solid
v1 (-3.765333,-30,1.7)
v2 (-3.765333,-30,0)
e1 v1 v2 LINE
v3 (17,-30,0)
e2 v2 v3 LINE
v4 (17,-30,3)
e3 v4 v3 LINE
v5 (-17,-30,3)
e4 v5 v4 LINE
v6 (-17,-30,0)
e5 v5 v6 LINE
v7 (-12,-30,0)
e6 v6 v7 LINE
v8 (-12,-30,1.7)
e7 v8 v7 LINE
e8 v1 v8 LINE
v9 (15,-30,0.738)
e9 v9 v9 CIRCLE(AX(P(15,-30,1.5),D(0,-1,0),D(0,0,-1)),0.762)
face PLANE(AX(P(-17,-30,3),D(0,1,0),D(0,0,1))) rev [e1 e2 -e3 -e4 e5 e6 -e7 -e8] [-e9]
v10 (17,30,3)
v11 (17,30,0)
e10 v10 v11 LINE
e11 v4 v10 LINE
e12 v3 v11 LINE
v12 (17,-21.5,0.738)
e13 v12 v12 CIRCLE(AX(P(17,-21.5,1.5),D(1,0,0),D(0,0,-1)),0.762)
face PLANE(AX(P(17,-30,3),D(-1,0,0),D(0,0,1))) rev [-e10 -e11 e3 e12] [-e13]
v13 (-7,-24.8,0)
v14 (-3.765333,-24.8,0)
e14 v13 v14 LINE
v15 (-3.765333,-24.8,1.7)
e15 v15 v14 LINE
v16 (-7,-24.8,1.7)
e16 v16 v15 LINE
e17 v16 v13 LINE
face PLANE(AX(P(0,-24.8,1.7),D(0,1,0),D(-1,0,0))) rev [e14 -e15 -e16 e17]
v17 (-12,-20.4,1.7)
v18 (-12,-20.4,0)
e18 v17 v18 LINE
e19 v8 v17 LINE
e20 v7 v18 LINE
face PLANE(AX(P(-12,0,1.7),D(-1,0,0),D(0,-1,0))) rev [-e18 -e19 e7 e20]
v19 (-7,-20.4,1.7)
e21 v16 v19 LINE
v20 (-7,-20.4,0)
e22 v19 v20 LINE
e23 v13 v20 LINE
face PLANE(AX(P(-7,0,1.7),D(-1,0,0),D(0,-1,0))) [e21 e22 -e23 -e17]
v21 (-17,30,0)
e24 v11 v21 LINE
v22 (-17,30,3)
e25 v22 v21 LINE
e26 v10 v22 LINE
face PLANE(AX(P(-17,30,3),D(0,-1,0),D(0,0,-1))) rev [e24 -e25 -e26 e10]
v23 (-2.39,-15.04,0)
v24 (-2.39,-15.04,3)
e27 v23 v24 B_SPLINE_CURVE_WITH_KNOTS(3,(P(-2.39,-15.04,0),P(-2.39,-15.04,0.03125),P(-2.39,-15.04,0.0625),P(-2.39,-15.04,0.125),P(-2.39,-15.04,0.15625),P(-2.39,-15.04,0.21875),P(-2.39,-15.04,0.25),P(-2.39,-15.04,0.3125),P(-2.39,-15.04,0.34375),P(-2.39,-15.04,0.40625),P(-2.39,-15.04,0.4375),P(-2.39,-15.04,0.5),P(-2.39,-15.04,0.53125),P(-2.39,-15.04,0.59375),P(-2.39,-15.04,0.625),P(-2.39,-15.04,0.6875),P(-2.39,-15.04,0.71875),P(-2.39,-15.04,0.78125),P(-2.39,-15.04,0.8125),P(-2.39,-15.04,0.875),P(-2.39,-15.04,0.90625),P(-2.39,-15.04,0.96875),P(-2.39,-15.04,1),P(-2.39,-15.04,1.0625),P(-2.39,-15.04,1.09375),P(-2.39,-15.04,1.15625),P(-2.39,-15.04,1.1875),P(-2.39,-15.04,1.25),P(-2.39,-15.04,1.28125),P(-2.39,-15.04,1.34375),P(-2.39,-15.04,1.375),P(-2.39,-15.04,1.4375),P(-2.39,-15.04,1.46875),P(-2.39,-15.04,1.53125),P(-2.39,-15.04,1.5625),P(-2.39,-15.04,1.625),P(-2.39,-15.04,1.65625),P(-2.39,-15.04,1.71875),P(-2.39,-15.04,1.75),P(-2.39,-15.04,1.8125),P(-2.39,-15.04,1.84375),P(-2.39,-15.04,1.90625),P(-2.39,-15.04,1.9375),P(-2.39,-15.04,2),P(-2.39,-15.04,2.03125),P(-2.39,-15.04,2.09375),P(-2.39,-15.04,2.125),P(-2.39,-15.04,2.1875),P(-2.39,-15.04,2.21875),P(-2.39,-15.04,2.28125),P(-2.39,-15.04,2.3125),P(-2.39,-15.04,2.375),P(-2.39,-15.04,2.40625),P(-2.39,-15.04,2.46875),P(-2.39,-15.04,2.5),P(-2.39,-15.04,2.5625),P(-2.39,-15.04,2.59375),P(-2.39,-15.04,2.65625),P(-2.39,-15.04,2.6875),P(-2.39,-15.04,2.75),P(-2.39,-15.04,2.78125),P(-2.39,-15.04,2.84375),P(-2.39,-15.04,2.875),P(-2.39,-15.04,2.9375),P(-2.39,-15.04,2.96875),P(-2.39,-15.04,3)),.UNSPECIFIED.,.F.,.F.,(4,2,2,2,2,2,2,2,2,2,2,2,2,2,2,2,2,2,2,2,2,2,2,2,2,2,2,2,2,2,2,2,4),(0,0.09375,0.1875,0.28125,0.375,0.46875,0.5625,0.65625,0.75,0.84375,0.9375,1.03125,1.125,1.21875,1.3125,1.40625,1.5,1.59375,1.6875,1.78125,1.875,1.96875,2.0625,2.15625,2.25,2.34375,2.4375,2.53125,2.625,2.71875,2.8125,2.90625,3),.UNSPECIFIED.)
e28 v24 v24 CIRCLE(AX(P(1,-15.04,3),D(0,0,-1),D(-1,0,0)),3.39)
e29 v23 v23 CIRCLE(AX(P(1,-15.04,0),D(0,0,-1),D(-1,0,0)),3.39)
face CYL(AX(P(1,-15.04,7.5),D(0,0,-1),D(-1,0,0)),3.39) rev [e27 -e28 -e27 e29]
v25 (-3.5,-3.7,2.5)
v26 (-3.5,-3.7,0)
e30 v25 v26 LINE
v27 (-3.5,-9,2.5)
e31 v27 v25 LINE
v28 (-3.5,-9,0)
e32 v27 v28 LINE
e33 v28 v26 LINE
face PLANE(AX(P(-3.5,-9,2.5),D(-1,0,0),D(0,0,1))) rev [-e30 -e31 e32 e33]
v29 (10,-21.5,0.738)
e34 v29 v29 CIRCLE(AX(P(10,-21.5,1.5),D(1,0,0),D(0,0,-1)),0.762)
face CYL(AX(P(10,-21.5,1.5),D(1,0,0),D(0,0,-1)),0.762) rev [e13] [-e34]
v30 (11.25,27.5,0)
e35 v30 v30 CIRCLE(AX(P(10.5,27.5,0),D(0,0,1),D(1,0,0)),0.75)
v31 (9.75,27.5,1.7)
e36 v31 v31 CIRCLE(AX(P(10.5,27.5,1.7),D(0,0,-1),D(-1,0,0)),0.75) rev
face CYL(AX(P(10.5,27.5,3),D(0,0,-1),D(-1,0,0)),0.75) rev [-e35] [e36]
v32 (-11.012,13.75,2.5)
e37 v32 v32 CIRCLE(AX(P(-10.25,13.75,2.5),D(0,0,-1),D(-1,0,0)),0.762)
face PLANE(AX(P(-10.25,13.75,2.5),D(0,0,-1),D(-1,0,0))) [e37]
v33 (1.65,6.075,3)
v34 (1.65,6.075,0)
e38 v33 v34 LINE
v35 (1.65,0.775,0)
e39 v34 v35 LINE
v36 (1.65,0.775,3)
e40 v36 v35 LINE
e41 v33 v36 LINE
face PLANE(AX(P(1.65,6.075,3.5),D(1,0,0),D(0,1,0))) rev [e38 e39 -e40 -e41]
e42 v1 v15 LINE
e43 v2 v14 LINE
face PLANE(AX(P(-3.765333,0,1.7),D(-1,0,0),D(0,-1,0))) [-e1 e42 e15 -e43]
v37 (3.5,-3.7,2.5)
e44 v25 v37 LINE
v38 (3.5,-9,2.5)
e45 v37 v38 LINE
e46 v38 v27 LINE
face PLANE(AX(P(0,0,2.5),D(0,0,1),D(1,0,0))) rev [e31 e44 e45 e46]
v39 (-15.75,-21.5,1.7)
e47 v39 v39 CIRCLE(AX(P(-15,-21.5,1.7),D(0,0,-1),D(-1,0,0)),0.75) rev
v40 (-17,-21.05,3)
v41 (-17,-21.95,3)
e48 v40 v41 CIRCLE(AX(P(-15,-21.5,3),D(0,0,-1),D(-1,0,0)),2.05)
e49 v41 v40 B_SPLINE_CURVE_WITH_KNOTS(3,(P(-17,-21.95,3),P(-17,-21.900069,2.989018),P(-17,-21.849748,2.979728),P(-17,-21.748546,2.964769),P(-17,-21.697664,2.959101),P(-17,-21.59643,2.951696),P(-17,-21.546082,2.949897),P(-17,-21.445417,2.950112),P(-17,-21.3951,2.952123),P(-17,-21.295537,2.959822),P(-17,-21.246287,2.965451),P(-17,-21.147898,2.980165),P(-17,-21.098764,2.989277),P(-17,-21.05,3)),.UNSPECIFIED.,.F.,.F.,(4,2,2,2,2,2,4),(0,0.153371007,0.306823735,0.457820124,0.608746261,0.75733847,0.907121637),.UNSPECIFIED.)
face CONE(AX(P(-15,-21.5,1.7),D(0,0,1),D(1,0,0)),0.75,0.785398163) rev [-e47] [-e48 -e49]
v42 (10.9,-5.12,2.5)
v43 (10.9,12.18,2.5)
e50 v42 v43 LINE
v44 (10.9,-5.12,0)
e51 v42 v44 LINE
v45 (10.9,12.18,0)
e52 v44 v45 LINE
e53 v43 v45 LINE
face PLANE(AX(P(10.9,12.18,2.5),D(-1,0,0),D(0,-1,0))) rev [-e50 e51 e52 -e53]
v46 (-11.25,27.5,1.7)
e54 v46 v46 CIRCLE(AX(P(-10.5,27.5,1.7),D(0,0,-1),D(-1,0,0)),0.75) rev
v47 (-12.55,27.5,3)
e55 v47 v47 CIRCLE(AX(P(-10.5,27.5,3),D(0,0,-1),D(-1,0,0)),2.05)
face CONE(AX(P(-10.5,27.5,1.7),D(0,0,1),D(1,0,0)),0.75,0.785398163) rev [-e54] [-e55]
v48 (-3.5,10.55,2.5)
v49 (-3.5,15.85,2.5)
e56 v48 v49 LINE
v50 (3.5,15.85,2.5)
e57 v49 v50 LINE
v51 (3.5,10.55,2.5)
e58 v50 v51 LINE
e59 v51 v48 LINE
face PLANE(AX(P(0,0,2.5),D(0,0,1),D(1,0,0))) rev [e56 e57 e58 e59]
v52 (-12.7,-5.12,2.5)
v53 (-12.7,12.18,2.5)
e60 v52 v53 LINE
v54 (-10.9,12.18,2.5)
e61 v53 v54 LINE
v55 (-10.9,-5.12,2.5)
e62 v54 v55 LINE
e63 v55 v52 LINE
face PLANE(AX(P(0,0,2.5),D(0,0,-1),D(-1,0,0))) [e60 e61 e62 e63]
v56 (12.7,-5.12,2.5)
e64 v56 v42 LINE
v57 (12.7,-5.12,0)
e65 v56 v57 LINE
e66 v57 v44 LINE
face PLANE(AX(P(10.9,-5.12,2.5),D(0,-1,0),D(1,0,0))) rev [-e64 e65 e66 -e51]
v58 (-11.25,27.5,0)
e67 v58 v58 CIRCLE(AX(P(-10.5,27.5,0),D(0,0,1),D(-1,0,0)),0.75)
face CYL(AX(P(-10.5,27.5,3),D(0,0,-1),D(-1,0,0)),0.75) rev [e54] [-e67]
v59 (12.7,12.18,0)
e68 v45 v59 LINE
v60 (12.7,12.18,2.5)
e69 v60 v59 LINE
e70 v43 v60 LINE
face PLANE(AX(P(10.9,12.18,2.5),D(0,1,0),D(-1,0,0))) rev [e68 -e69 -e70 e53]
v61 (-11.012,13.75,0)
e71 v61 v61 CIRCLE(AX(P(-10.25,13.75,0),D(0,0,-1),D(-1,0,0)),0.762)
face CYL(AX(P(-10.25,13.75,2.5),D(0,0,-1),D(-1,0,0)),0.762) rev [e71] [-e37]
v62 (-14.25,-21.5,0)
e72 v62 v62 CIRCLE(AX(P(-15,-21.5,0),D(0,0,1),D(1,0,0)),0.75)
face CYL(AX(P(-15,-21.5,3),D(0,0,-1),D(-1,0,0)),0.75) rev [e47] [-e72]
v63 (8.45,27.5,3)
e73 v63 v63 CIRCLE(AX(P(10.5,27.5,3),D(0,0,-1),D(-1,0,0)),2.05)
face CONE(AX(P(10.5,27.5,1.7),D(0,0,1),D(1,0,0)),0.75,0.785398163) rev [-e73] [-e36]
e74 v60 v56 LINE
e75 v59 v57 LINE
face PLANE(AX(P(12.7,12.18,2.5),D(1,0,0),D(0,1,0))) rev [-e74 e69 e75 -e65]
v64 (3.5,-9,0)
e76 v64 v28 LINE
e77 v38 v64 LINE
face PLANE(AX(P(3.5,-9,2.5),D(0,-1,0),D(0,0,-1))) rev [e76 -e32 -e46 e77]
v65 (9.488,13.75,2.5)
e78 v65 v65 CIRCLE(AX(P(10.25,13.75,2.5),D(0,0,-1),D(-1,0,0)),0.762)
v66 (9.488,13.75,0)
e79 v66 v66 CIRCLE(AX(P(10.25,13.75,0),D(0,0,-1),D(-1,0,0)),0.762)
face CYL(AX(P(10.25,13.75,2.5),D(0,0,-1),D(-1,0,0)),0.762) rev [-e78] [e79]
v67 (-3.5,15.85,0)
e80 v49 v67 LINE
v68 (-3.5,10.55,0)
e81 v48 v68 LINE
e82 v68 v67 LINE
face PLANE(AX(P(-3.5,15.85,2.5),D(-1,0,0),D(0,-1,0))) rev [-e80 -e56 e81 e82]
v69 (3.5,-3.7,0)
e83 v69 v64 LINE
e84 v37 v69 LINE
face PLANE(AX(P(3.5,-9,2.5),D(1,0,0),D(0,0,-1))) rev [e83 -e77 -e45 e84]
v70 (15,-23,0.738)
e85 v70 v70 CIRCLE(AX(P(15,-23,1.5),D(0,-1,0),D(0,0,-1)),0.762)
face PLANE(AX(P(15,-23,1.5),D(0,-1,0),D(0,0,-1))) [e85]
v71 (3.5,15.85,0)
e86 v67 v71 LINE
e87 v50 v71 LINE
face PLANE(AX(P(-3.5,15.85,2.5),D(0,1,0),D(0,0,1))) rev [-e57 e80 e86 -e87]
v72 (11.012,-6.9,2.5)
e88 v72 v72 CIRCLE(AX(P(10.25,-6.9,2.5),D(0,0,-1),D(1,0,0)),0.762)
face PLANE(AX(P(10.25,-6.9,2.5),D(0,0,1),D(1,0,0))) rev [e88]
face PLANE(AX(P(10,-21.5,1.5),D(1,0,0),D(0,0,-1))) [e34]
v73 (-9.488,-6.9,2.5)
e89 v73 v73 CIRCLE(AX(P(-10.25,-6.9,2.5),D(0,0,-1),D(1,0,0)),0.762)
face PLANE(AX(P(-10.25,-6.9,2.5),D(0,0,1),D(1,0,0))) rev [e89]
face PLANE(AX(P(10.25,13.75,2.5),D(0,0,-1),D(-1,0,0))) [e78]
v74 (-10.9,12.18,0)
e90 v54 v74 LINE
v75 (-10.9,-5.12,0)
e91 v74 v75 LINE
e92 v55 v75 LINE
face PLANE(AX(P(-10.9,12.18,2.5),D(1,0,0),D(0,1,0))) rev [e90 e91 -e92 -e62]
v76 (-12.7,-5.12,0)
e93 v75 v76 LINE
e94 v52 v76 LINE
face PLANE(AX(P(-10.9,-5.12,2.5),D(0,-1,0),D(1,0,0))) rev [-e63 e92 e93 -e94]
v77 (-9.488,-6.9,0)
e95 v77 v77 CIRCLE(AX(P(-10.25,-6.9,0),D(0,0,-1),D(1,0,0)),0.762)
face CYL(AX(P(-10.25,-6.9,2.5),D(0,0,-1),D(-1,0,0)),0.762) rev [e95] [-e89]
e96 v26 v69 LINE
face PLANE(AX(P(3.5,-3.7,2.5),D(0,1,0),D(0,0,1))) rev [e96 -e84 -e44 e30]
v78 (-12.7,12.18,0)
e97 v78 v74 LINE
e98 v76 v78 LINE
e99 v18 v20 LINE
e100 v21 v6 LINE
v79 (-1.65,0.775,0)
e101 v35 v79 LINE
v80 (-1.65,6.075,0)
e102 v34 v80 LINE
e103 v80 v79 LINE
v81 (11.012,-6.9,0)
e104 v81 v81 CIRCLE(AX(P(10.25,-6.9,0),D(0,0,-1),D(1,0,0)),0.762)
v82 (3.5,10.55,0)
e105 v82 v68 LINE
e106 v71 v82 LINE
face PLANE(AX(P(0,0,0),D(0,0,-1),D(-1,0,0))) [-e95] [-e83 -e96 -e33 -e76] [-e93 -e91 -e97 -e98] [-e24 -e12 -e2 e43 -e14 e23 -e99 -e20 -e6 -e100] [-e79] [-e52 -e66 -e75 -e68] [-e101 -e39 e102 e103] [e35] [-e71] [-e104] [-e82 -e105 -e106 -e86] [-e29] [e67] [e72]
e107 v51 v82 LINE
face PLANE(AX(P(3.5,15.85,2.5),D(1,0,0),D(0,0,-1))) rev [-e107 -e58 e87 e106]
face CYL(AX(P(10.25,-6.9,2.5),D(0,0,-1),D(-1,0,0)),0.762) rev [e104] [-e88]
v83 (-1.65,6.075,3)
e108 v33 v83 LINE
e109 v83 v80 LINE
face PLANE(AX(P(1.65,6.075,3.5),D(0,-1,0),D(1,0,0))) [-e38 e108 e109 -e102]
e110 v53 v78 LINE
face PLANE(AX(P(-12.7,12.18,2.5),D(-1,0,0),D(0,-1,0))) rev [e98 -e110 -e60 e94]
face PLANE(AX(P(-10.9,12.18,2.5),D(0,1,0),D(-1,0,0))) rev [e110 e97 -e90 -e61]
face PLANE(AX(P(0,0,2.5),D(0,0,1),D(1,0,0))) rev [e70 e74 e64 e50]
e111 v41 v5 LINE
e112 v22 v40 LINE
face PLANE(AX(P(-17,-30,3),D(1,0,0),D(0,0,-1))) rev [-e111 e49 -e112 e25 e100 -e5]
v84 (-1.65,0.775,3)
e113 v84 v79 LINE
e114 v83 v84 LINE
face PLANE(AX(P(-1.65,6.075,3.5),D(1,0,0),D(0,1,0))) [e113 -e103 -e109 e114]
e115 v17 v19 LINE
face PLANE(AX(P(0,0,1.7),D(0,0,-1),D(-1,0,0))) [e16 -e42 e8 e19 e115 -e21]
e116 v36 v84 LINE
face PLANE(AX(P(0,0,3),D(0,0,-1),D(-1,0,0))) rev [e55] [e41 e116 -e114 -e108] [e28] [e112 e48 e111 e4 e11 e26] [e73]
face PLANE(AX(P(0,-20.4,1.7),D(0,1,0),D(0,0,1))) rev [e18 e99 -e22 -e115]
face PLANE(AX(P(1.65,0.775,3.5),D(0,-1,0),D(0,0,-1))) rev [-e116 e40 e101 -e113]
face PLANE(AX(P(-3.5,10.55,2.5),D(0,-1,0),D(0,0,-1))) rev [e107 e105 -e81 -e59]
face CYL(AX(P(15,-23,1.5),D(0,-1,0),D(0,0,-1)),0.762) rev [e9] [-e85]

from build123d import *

# Parameters (mm, degrees)
SKETCH1_W           = 34
SKETCH1_H           = 60
SKETCH1_R           = 0.75
BOSS_EXTRUDE1_DEPTH = 3
CHAMFER1_SIZE       = 1.3
SKETCH2_R           = 0.762
CUT_EXTRUDE1_DEPTH  = 7
SKETCH3_W           = 5
SKETCH3_H           = 4.4
CUT_EXTRUDE2_DEPTH  = 1.7
SKETCH4_R           = 0.762
CUT_EXTRUDE3_DEPTH  = 7
SKETCH5_W           = 3.3
SKETCH5_H           = 5.3
CUT_EXTRUDE4_DEPTH  = 3.5
SKETCH7_R           = 0.762
SKETCH7_W           = 7
SKETCH7_H           = 5.3
CUT_EXTRUDE5_DEPTH  = 2.5
SKETCH8_W           = 1.8
SKETCH8_H           = 17.3
CUT_EXTRUDE6_DEPTH  = 2.5
SKETCH9_R           = 3.39
CUT_EXTRUDE7_DEPTH  = 7.5


with BuildPart() as part:
    # Sketch1 → Boss-Extrude1 (new body)
    with BuildSketch(Plane.XY):
        Rectangle(SKETCH1_W, SKETCH1_H)
        with Locations((-15, -21.5)):
            Circle(SKETCH1_R, mode=Mode.SUBTRACT)
        with Locations(Location((-10.5, 27.5, 0), (0, 0, 180))):
            Circle(SKETCH1_R, mode=Mode.SUBTRACT)
        with Locations((10.5, 27.5)):
            Circle(SKETCH1_R, mode=Mode.SUBTRACT)
    extrude(amount=BOSS_EXTRUDE1_DEPTH)

    # Chamfer1
    # the kernel refuses this chamfer: 1.3 mm, written as the material it takes off along each edge
    with BuildSketch(Plane(origin=(-15, -21.5, 3), x_dir=(1, 0, 0), z_dir=(0, -1, 0))) as chamfer1_piece_1:
        Polygon((0.75, -CHAMFER1_SIZE), (0.75 + CHAMFER1_SIZE, 0), (0.75, 0), align=None)
    revolve(axis=Axis((-15, -21.5, 3), (0, 0, 1)), mode=Mode.SUBTRACT)
    with BuildSketch(Plane(origin=(-10.5, 27.5, 3), x_dir=(-1, 0, 0), z_dir=(0, 1, 0))) as chamfer1_piece_2:
        Polygon((0.75, -CHAMFER1_SIZE), (0.75 + CHAMFER1_SIZE, 0), (0.75, 0), align=None)
    revolve(axis=Axis((-10.5, 27.5, 3), (0, 0, 1)), mode=Mode.SUBTRACT)
    with BuildSketch(Plane(origin=(10.5, 27.5, 3), x_dir=(1, 0, 0), z_dir=(0, -1, 0))) as chamfer1_piece_3:
        Polygon((0.75, -CHAMFER1_SIZE), (0.75 + CHAMFER1_SIZE, 0), (0.75, 0), align=None)
    revolve(axis=Axis((10.5, 27.5, 3), (0, 0, 1)), mode=Mode.SUBTRACT)

    # Sketch2 → Cut-Extrude1 (cut)
    with BuildSketch(Plane(origin=(17, 0, 0), x_dir=(0, 0, -1), z_dir=(1, 0, 0))):
        with Locations((-1.5, -21.5)):
            Circle(SKETCH2_R)
    extrude(amount=-CUT_EXTRUDE1_DEPTH, mode=Mode.SUBTRACT)

    # Sketch3 → Cut-Extrude2 (cut)
    with BuildSketch(Plane(origin=(0, 0, 0), x_dir=(-1, 0, 0), z_dir=(0, 0, -1))):
        Polygon((3.765333438, -30), (12, -30), (12, -24.8), (7, -24.8), (3.765333438, -24.8), align=None)
        with Locations((9.5, -22.6)):
            Rectangle(SKETCH3_W, SKETCH3_H)
    extrude(amount=-CUT_EXTRUDE2_DEPTH, mode=Mode.SUBTRACT)

    # Sketch4 → Cut-Extrude3 (cut)
    with BuildSketch(Plane.XZ.offset(30)):
        with Locations(Location((15, 1.5, 0), (0, 0, 270))):
            Circle(SKETCH4_R)
    extrude(amount=-CUT_EXTRUDE3_DEPTH, mode=Mode.SUBTRACT)

    # Sketch5 → Cut-Extrude4 (cut)
    with BuildSketch(Plane(origin=(0, 0, 0), x_dir=(-1, 0, 0), z_dir=(0, 0, -1))):
        with Locations((0, 3.425)):
            Rectangle(SKETCH5_W, SKETCH5_H)
    extrude(amount=-CUT_EXTRUDE4_DEPTH, mode=Mode.SUBTRACT)

    # Sketch7 → Cut-Extrude5 (cut)
    with BuildSketch(Plane(origin=(0, 0, 0), x_dir=(-1, 0, 0), z_dir=(0, 0, -1))):
        with Locations((-10.25, 13.75)):
            Circle(SKETCH7_R)
        with Locations((10.25, 13.75)):
            Circle(SKETCH7_R)
        with Locations(Location((10.25, -6.9, 0), (0, 0, 180))):
            Circle(SKETCH7_R)
        with Locations(Location((-10.25, -6.9, 0), (0, 0, 180))):
            Circle(SKETCH7_R)
        with Locations((0, 13.2)):
            Rectangle(SKETCH7_W, SKETCH7_H)
        with Locations((0, -6.35)):
            Rectangle(SKETCH7_W, SKETCH7_H)
    extrude(amount=-CUT_EXTRUDE5_DEPTH, mode=Mode.SUBTRACT)

    # Sketch8 → Cut-Extrude6 (cut)
    with BuildSketch(Plane(origin=(0, 0, 0), x_dir=(-1, 0, 0), z_dir=(0, 0, -1))):
        with Locations((11.8, 3.53)):
            Rectangle(SKETCH8_W, SKETCH8_H)
        with Locations((-11.8, 3.53)):
            Rectangle(SKETCH8_W, SKETCH8_H)
    extrude(amount=-CUT_EXTRUDE6_DEPTH, mode=Mode.SUBTRACT)

    # Sketch9 → Cut-Extrude7 (cut)
    with BuildSketch(Plane(origin=(0, 0, 0), x_dir=(-1, 0, 0), z_dir=(0, 0, -1))):
        with Locations((-1, -15.04)):
            Circle(SKETCH9_R)
    extrude(amount=-CUT_EXTRUDE7_DEPTH, mode=Mode.SUBTRACT)


solid = part.part
